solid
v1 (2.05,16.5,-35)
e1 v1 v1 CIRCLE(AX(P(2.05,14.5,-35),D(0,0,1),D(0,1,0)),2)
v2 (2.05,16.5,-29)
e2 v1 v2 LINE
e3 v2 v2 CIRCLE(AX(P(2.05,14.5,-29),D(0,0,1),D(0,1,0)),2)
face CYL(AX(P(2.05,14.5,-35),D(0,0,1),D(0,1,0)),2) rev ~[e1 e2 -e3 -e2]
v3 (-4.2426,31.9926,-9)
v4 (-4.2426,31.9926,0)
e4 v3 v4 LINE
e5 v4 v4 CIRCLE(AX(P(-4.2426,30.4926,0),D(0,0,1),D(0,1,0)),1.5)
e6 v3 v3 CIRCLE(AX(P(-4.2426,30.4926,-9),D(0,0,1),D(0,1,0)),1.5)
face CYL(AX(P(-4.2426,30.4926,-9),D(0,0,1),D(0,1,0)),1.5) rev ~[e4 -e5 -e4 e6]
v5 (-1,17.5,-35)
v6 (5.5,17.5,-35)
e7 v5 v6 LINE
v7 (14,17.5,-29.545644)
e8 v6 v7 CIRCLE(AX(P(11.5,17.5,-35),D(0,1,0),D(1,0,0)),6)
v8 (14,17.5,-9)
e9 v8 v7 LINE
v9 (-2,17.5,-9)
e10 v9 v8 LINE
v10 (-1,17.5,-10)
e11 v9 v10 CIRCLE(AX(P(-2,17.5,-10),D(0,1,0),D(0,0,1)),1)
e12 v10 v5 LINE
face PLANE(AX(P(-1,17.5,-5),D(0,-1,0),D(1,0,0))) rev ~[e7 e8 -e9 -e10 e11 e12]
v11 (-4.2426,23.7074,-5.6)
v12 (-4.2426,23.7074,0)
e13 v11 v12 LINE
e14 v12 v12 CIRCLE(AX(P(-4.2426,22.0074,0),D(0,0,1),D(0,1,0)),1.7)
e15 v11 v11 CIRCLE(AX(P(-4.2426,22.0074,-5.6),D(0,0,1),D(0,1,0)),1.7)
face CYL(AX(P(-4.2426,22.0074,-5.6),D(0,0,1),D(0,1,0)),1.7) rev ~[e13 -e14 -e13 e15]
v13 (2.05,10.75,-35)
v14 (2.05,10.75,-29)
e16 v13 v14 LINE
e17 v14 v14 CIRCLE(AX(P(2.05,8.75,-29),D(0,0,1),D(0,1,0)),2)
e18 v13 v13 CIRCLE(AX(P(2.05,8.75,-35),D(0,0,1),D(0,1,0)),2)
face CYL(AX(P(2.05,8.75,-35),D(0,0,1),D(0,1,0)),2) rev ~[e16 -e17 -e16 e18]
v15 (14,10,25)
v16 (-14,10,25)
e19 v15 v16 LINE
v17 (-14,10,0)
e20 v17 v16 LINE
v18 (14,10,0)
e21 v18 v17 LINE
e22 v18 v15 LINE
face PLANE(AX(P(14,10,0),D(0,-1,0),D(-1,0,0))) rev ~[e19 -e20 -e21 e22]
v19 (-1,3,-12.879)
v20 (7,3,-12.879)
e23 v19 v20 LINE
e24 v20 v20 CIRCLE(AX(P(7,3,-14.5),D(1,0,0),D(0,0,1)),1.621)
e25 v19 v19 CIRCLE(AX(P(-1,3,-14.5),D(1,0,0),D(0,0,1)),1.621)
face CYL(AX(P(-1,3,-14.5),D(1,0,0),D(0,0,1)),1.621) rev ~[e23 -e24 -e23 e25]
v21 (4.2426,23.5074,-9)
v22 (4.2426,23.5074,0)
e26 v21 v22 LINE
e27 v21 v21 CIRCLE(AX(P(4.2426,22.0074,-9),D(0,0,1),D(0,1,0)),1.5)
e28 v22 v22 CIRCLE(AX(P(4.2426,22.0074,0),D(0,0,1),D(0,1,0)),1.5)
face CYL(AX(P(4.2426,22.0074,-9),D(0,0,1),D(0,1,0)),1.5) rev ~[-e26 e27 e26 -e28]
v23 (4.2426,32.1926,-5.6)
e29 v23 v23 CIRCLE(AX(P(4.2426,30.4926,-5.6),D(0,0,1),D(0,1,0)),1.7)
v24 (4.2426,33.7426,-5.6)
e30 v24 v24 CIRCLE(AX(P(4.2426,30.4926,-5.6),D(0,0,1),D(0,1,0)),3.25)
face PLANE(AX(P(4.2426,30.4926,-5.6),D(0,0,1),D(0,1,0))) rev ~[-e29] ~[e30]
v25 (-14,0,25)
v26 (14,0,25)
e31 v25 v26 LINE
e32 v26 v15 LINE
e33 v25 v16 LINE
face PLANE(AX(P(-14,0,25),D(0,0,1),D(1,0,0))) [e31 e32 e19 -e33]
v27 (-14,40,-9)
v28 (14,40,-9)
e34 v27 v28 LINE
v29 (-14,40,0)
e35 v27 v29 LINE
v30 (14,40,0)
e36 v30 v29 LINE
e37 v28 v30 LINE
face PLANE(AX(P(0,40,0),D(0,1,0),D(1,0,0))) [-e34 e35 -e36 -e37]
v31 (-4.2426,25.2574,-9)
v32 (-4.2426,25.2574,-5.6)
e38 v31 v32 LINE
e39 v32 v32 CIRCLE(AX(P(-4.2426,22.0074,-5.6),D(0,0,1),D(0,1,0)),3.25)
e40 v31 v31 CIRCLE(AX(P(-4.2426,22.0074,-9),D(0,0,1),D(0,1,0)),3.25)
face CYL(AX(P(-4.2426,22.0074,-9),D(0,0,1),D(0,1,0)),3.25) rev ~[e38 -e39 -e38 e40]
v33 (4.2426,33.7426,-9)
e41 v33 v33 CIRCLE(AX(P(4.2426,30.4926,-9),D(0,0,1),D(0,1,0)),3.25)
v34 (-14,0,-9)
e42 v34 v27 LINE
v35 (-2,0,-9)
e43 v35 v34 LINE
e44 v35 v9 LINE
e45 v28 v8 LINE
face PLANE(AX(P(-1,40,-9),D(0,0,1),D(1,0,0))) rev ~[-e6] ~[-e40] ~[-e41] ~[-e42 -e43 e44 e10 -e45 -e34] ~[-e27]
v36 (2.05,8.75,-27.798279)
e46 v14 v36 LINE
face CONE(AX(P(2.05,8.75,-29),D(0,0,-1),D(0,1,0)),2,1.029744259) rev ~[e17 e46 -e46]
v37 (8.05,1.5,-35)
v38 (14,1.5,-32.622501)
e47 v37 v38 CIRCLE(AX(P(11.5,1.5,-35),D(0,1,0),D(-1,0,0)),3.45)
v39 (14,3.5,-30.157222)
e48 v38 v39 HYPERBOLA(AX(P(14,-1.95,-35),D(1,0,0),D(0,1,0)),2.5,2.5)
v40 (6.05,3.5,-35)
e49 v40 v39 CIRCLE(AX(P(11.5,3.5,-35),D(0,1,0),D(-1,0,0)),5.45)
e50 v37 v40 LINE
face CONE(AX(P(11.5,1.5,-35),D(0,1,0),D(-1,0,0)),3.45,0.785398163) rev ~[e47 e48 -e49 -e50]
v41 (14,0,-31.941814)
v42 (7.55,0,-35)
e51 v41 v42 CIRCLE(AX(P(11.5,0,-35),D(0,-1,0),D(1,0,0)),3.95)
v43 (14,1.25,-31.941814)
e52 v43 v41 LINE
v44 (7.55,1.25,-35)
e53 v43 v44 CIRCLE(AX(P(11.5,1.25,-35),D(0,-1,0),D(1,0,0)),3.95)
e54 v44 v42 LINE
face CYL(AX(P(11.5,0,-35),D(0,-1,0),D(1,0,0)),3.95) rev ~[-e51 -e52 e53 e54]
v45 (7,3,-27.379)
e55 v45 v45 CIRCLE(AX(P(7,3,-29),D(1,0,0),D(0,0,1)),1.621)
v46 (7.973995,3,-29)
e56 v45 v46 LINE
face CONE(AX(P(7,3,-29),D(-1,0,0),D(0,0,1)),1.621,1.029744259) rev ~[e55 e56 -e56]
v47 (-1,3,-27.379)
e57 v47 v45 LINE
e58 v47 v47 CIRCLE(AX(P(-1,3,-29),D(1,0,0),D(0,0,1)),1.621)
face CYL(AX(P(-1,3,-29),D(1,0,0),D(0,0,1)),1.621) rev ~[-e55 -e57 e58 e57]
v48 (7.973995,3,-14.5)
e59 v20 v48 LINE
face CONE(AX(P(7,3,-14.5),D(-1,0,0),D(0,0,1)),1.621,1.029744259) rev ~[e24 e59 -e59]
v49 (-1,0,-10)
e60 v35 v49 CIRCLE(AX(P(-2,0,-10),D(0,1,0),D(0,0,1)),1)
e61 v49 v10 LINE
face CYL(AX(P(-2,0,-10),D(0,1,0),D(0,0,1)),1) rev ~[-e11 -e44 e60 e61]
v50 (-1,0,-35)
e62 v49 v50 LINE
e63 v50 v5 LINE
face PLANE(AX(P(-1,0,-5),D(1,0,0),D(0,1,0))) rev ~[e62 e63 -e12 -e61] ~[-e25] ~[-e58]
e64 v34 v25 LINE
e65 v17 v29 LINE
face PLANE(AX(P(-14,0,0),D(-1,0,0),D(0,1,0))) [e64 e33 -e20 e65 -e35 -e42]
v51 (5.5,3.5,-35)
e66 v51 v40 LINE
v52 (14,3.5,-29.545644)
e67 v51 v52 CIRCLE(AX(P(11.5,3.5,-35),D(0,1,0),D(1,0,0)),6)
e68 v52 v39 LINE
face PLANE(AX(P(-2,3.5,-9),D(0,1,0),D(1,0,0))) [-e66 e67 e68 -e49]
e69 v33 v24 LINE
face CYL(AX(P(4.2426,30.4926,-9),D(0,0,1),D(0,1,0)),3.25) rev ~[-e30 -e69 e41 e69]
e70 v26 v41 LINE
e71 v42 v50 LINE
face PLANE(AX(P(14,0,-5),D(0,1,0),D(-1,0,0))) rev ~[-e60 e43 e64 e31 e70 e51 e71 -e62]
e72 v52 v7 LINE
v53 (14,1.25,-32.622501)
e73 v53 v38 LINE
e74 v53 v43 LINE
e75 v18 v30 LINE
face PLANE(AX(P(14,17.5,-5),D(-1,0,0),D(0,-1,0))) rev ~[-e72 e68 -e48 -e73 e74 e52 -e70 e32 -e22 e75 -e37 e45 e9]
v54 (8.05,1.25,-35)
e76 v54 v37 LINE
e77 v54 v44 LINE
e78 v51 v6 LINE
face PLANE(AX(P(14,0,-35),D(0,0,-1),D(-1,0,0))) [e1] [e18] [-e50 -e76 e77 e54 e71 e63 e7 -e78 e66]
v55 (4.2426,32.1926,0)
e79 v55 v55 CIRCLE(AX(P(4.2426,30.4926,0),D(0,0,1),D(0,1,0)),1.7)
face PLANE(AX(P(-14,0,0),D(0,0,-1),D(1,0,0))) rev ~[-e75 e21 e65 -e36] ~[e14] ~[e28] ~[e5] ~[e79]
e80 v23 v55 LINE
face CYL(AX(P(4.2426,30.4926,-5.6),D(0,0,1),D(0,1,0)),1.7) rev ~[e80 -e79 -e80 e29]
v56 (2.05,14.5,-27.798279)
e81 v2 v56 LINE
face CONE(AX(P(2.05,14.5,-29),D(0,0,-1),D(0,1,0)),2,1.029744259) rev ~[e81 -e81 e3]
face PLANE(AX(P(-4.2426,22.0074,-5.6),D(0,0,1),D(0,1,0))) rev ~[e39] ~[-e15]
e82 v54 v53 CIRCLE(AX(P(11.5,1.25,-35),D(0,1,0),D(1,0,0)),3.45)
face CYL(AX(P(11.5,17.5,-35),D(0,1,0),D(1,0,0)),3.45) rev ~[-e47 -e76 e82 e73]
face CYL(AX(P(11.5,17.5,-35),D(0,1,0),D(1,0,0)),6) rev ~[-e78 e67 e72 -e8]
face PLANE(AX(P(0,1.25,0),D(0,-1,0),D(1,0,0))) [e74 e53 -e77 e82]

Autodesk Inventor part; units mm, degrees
ref_plane "YZ Plane" through (0, 0, 0) normal (1, 0, 0) x (0, 1, 0)
ref_plane "XZ Plane" through (0, 0, 0) normal (0, 1, 0) x (-1, 0, 0)
ref_plane "XY Plane" through (0, 0, 0) normal (0, 0, 1) x (1, 0, 0)
sketch "Skizze2" plane through (0, 0, 0) normal (0, 1, 0) x (-1, 0, 0)
  line L0 (14, 0) -> (-14, 0)
  line L1 (-14, 0) -> (-14, -5)
  line L2 (-14, -5) -> (1, -5)
  line L3 (1, -5) -> (1, -9)
  line L4 (1, -9) -> (14, -9)
  line L5 (14, -9) -> (14, 0)
  line L6 (0, -10.8) -> (0, 1.8) projected
  line L7 (19.6, 0) -> (-19.6, 0) projected
  point P0 (0, 0)
  dimension "d4" = 28
  dimension "d5" = 9
  dimension "d6" = 5
  dimension "d8" = 13
  dimension "d9" = 15
extrude "Extrusion2" add sketch "Skizze2" along normal blind 40
sketch "Skizze4" plane through (0, 40, 0) normal (0, 1, 0) x (1, 0, 0)
  line L0 (14, 5) -> (-1, 5)
  line L1 (-1, 5) -> (-1, 9)
  line L2 (-1, 9) -> (14, 9)
  line L3 (14, 9) -> (14, 5)
  line L4 (14, 5) -> (-1, 9) construction
  line L5 (-1, 5) -> (14, 9) construction
  line L6 (14, 5) -> (-1, 5) projected
  line L7 (-1, 5) -> (-1, 9) projected
  point P0 (0, 0)
  point P1 (6.5, 7)
extrude "Extrusion3" add sketch "Skizze4" against normal blind 22.5
sketch "Skizze6" plane through (14, 40, -9) normal (0, 0, -1) x (-1, 0, 0)
  line L0 (14, -48) -> (14, 8) projected
  line L1 (0, 0) -> (28, 0) projected
  point P0 (14, -40)
  point P1 (9.7574, -9.5074)
  point P2 (18.2426, -9.5074)
  point P3 (18.2426, -17.9926)
  point P4 (9.7574, -17.9926)
  dimension "d44" = 8.4853
  dimension "d45" = 8.4853
  dimension "d46" = 9.5074
  dimension "d47" = 17.9926
hole "Bohrung3" at (4.2426, 22.0074, -9) at (-4.2426, 30.4926, -9) direction (0, 0, 1) diameter 3 end through all
hole "Bohrung4" at (4.2426, 30.4926, -9) at (-4.2426, 22.0074, -9) direction (0, 0, 1) diameter 3.4 end through all counterbore diameter 6.5 counterbore depth 3.4 clearance for "Sechskantkopfschraube DIN EN 24017" size "M3" standard "DIN"
sketch "Skizze8" plane through (-14, 0, 0) normal (0, 0, 1) x (1, 0, 0)
  line L0 (0, 0) -> (0, 40) projected
  line L1 (28, 0) -> (28, 17.5) projected
  line L2 (0, 0) -> (28, 0)
  line L3 (28, 0) -> (28, 10)
  line L4 (28, 10) -> (0, 10)
  line L5 (0, 10) -> (0, 0)
  point P0 (14, 0)
  point P1 (0, 10)
  dimension "d85" = 10
extrude "Extrusion4" add sketch "Skizze8" along normal blind 25
sketch "Skizze9" plane through (14, 0, -5) normal (0, 0, -1) x (-1, 0, 0)
  line L0 (0, 0) -> (15, 0) projected
  line L1 (15, 0) -> (15, 17.5) projected
  line L2 (0, 0) -> (15, 0)
  line L3 (15, 0) -> (15, 17.5)
  line L4 (15, 17.5) -> (0, 17.5)
  line L5 (0, 17.5) -> (0, 0)
  point P0 (14, 0)
extrude "Extrusion5" add sketch "Skizze9" along normal blind 30
sketch "Skizze13" plane through (14, 0, -35) normal (0, 0, -1) x (-1, 0, 0)
  line L0 (0, 3.5) -> (0, 17.5) projected
  line L1 (15, 17.5) -> (0, 17.5) projected
  point P0 (14, 0)
  point P1 (11.95, 14.5)
  point P2 (11.95, 8.75)
  point P3 (6, 17.5)
  dimension "d102" = 11.95
  dimension "d103" = 3
  dimension "d104" = 8.75
hole "Bohrung7" at (2.05, 14.5, -35) at (2.05, 8.75, -35) direction (0, 0, 1) diameter 4 depth 6 tip angle 118
sketch "Skizze14" plane through (-1, 0, -9) normal (-1, 0, 0) x (0, 0, 1)
  line L0 (0, 0) -> (-26, 0) projected
  line L1 (-26, 0) -> (-26, 17.5) projected
  point P0 (9, 0)
  point P1 (-20, 3)
  point P2 (-5.5, 3)
  dimension "d112" = 3
  dimension "d113" = 6
  dimension "d114" = 14.5
hole "Bohrung8" at (-1, 3, -29) at (-1, 3, -14.5) direction (1, 0, 0) diameter 3.242 depth 8 tip angle 118 thread size "M4x0.7" class "6H" standard "ISO Metric profile"
fillet "Rundung2" radius 1 1 edges at (-1, 8.75, -9)
sketch "Skizze15" plane through (-1, 17.5, -35) normal (0, 1, 0) x (1, 0, 0)
  circle A0 centre (12.5, 0) radius 3.45
  line L0 (15, -26) -> (15, 0) projected
  line L1 (0, 0) -> (15, 0) projected
  point P0 (1, -35)
  dimension "d123" = 6.9
  dimension "d124" = 2.5
extrude "Extrusion9" cut sketch "Skizze15" against normal through all
sketch "Skizze16" plane through (-2, 17.5, -9) normal (0, 1, 0) x (1, 0, 0)
  circle A0 centre (13.5, 26) radius 6
  arc A1 (10.05, 26) -> (16, 23.6225) centre (13.5, 26) ccw projected
  point P0 (2, -9)
  dimension "d127" = 12
extrude "Extrusion10" cut sketch "Skizze16" against normal blind 14
chamfer "Fasen3" distance 2 angle 45 1 edges at (10.2199, 3.5, -31.7963)
sketch "Skizze18" plane through (0, 0, 0) normal (0, -1, 0) x (1, 0, 0)
  circle A0 centre (11.5, -35) radius 3.95
  arc A1 (14, -32.6225) -> (8.05, -35) centre (11.5, -35) ccw projected
  point P0 (0, 0)
  dimension "d134" = 7.9
extrude "Extrusion11" cut sketch "Skizze18" against normal blind 1.25
properties part number "JH_int_Adapterplatte"
